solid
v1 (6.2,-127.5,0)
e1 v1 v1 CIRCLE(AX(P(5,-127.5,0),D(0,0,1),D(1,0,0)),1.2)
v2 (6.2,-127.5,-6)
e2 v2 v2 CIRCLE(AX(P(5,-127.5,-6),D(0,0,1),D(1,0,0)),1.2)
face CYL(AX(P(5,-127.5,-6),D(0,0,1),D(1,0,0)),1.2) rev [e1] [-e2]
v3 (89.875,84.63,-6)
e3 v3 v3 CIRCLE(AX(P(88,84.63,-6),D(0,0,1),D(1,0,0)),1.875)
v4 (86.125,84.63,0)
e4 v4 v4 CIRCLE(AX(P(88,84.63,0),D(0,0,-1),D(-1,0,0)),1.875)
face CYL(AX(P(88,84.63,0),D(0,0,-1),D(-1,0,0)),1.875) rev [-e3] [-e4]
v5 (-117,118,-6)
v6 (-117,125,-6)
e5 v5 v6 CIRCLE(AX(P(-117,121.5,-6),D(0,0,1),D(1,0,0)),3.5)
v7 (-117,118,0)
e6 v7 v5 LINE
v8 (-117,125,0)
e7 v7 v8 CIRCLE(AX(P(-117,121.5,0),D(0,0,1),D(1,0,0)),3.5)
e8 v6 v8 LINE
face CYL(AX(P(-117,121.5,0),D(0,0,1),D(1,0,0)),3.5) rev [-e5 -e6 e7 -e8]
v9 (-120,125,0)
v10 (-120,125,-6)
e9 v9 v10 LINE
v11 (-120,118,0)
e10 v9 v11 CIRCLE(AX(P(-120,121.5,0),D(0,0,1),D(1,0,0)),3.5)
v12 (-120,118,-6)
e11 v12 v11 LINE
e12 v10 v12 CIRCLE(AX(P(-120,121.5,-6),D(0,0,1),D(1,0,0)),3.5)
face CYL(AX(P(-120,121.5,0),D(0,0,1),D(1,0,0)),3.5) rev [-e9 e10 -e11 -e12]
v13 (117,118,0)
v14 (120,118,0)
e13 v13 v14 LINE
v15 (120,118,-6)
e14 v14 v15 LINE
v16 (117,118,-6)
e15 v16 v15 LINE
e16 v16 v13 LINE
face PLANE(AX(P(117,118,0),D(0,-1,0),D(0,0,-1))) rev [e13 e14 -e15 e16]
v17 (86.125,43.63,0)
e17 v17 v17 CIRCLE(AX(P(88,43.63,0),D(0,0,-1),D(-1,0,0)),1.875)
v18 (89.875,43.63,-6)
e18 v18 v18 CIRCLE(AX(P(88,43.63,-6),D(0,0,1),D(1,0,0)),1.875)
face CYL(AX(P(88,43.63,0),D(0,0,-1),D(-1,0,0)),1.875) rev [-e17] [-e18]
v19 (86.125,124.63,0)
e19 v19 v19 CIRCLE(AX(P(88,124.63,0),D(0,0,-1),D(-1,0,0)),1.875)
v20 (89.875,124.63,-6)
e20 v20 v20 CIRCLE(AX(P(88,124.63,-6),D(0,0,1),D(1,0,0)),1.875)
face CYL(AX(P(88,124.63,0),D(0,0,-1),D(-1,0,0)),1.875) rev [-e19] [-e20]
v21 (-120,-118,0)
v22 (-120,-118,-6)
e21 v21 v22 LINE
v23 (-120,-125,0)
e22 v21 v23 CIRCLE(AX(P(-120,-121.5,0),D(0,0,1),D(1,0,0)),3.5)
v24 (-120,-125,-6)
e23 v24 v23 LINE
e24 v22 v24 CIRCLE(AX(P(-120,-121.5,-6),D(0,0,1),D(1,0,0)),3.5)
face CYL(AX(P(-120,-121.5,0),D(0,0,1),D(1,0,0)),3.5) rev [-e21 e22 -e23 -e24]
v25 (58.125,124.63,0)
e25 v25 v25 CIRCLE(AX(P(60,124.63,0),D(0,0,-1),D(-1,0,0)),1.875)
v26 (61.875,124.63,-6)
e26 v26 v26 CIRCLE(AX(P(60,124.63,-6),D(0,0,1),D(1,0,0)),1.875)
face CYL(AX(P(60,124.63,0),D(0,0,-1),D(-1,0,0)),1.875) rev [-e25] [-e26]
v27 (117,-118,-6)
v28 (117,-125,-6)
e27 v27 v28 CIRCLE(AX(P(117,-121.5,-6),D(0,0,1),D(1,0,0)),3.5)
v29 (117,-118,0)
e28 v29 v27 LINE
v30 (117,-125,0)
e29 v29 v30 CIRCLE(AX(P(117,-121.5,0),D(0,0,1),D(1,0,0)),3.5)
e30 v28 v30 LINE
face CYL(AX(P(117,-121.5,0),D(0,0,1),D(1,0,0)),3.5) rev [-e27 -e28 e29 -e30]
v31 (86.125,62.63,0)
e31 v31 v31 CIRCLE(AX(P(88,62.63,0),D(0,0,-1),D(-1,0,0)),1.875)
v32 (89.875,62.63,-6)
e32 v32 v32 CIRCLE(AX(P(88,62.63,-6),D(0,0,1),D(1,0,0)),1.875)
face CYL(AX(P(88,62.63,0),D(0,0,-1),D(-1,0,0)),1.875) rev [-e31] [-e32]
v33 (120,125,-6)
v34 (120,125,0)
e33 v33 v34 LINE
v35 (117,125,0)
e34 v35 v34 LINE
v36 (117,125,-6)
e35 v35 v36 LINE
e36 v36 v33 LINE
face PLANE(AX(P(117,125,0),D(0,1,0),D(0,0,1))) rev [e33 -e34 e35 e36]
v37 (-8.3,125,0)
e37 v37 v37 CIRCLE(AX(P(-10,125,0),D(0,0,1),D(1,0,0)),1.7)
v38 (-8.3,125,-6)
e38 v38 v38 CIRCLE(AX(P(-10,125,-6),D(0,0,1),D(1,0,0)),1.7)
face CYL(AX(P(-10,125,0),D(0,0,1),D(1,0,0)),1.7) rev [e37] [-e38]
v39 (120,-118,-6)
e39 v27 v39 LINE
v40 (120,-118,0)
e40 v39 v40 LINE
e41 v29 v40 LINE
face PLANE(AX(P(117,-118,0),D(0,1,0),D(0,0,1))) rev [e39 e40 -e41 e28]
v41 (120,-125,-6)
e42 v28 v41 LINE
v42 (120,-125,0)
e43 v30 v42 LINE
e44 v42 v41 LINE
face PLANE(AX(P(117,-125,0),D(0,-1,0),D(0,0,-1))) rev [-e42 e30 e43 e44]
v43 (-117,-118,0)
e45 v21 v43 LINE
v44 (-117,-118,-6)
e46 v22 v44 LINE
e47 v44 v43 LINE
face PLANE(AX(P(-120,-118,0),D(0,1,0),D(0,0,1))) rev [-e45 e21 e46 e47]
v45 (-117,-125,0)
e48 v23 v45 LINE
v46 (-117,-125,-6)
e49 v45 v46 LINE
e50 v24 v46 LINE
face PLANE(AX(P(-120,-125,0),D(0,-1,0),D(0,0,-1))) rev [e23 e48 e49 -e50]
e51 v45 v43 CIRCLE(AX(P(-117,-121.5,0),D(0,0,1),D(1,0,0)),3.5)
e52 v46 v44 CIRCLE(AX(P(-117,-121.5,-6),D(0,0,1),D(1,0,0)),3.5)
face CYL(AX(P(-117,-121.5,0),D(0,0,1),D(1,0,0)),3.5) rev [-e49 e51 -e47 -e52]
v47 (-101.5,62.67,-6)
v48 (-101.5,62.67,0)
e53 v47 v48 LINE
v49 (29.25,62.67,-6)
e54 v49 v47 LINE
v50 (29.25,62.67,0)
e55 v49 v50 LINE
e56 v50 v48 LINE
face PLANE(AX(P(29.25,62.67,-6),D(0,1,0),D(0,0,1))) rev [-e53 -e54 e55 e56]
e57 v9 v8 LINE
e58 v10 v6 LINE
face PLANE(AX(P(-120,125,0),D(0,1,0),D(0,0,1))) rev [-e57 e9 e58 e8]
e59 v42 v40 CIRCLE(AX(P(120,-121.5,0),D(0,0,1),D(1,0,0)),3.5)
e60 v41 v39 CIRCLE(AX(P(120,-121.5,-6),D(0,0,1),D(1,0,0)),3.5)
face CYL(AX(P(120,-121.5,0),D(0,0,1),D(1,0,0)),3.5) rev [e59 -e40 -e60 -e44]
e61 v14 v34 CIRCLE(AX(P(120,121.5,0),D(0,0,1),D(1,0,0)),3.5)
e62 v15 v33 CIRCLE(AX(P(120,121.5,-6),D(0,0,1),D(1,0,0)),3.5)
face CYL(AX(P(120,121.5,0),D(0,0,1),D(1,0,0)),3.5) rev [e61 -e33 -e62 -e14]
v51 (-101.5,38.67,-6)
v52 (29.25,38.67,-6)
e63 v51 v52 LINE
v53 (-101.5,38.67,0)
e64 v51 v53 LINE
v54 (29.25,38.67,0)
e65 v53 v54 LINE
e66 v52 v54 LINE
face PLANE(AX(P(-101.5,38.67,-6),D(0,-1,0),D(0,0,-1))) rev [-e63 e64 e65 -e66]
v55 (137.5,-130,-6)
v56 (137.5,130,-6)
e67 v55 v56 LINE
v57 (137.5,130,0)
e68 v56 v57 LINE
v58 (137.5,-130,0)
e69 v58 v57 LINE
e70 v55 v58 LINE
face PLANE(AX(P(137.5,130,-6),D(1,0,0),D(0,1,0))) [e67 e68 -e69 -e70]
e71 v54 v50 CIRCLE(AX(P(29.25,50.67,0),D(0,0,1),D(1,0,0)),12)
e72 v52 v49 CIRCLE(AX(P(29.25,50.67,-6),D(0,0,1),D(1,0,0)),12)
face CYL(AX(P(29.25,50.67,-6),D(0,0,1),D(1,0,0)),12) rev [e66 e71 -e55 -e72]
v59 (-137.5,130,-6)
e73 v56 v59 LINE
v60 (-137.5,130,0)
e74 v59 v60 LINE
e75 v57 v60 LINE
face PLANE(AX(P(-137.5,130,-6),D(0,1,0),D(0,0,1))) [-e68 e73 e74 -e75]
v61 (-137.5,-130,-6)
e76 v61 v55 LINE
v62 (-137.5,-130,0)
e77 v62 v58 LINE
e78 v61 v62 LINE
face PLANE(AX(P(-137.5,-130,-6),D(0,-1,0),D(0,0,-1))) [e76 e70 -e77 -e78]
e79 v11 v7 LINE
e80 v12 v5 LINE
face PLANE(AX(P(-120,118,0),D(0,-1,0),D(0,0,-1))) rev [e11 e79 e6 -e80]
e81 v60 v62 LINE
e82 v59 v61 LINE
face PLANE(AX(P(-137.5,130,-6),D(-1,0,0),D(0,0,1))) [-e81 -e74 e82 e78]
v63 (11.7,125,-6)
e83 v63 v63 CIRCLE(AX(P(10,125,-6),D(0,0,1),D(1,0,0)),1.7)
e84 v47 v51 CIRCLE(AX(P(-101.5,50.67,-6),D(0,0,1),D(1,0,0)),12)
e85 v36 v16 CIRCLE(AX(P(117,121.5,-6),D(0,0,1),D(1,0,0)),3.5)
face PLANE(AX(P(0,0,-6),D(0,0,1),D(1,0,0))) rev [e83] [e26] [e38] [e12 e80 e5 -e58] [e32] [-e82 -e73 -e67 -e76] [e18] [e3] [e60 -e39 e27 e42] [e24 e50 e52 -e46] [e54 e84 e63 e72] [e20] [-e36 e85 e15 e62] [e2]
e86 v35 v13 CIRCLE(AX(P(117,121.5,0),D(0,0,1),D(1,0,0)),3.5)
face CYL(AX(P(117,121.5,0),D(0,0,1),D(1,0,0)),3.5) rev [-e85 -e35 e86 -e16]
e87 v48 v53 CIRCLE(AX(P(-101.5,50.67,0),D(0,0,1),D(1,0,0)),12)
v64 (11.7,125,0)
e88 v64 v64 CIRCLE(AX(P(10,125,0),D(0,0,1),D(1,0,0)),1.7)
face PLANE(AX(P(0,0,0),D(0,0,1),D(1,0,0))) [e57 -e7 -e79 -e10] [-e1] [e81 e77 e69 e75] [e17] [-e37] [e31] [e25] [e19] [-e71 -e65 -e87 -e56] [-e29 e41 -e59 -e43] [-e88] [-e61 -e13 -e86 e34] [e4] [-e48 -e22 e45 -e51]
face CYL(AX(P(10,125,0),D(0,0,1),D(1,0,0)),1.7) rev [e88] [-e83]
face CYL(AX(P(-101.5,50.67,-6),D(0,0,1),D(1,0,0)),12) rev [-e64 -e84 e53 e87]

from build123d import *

# Parameters (mm, degrees)
CROQUIS1_W                      = 275
CROQUIS1_H                      = 260
BRIDA_BASE1_DEPTH               = 6
CORTAR_EXTRUIR1_DEPTH           = 190.320495457
CORTAR_EXTRUIR1_DEPTH_BACK      = 190.320495457
CROQUIS3_R                      = 1.875
CORTAR_EXTRUIR2_DEPTH           = 190.320495457
CORTAR_EXTRUIR2_DEPTH_BACK      = 190.320495457
RANURA_START                    = -6
RANURA_DE_MARGEN_PARA_M61_DEPTH = 6
CROQUIS9_R                      = 1.2
CORTAR_EXTRUIR4_DEPTH           = 190.320495457
TALADRO_DE_MARGEN_PARA_M31_D    = 3.4


# Read off the part's stored shape, not the designer's step: Ranura de margen para M61
# Sheet-metal steps are written as plain solids
with BuildPart() as part:
    # Croquis1 → Brida base1 (new body)
    with BuildSketch(Plane.XY):
        Rectangle(CROQUIS1_W, CROQUIS1_H)
    extrude(amount=-BRIDA_BASE1_DEPTH)

    # Croquis3 → Cortar-Extruir1 (cut, two sides: drawn at the far end of the back side and taken through both)
    with BuildSketch(Plane(origin=(0, 0, -6), x_dir=(-1, 0, 0), z_dir=(0, 0, -1)).offset(-CORTAR_EXTRUIR1_DEPTH_BACK)):
        with Locations((-88, 84.63)):
            Circle(CROQUIS3_R)
        with Locations((-60, 124.63)):
            Circle(CROQUIS3_R)
        with Locations((-88, 124.63)):
            Circle(CROQUIS3_R)
        with Locations((-88, 62.63)):
            Circle(CROQUIS3_R)
        with Locations((-88, 43.63)):
            Circle(CROQUIS3_R)
    extrude(amount=CORTAR_EXTRUIR1_DEPTH + CORTAR_EXTRUIR1_DEPTH_BACK, mode=Mode.SUBTRACT)

    # Croquis4 → Cortar-Extruir2 (cut, two sides: drawn at the far end of the back side and taken through both)
    with BuildSketch(Plane.XY.offset(-CORTAR_EXTRUIR2_DEPTH_BACK)):
        with BuildLine():
            Line((-101.5, 38.67), (29.25, 38.67))
            ThreePointArc((29.25, 38.67), (41.25, 50.67), (29.25, 62.67))
            Line((29.25, 62.67), (-101.5, 62.67))
            ThreePointArc((-101.5, 62.67), (-113.5, 50.67), (-101.5, 38.67))
        make_face()
    extrude(amount=CORTAR_EXTRUIR2_DEPTH + CORTAR_EXTRUIR2_DEPTH_BACK, mode=Mode.SUBTRACT)

    # Ranura de margen para M61 outline → Ranura de margen para M61 (cut)
    with BuildSketch(Plane.XY.offset(RANURA_START)):
        with BuildLine():
            Line((117, 118), (120, 118))
            ThreePointArc((120, 118), (123.5, 121.5), (120, 125))
            Line((120, 125), (117, 125))
            ThreePointArc((117, 125), (113.5, 121.5), (117, 118))
        make_face()
        with BuildLine():
            ThreePointArc((-117, 118), (-113.5, 121.5), (-117, 125))
            Line((-117, 125), (-120, 125))
            ThreePointArc((-120, 125), (-123.5, 121.5), (-120, 118))
            Line((-120, 118), (-117, 118))
        make_face()
        with BuildLine():
            Line((-120, -125), (-117, -125))
            ThreePointArc((-117, -125), (-113.5, -121.5), (-117, -118))
            Line((-117, -118), (-120, -118))
            ThreePointArc((-120, -118), (-123.5, -121.5), (-120, -125))
        make_face()
        with BuildLine():
            ThreePointArc((120, -125), (123.5, -121.5), (120, -118))
            Line((120, -118), (117, -118))
            ThreePointArc((117, -118), (113.5, -121.5), (117, -125))
            Line((117, -125), (120, -125))
        make_face()
    extrude(amount=RANURA_DE_MARGEN_PARA_M61_DEPTH, mode=Mode.SUBTRACT)

    # Croquis9 → Cortar-Extruir4 (cut, through all)
    with BuildSketch(Plane.XY):
        with Locations((5, -127.5)):
            Circle(CROQUIS9_R)
    extrude(amount=-CORTAR_EXTRUIR4_DEPTH, mode=Mode.SUBTRACT)

    # Taladro de margen para M31 (through all)
    with Locations(Plane.XY):
        with Locations((10, 125), (-10, 125)):
            Hole(TALADRO_DE_MARGEN_PARA_M31_D / 2)


solid = part.part
